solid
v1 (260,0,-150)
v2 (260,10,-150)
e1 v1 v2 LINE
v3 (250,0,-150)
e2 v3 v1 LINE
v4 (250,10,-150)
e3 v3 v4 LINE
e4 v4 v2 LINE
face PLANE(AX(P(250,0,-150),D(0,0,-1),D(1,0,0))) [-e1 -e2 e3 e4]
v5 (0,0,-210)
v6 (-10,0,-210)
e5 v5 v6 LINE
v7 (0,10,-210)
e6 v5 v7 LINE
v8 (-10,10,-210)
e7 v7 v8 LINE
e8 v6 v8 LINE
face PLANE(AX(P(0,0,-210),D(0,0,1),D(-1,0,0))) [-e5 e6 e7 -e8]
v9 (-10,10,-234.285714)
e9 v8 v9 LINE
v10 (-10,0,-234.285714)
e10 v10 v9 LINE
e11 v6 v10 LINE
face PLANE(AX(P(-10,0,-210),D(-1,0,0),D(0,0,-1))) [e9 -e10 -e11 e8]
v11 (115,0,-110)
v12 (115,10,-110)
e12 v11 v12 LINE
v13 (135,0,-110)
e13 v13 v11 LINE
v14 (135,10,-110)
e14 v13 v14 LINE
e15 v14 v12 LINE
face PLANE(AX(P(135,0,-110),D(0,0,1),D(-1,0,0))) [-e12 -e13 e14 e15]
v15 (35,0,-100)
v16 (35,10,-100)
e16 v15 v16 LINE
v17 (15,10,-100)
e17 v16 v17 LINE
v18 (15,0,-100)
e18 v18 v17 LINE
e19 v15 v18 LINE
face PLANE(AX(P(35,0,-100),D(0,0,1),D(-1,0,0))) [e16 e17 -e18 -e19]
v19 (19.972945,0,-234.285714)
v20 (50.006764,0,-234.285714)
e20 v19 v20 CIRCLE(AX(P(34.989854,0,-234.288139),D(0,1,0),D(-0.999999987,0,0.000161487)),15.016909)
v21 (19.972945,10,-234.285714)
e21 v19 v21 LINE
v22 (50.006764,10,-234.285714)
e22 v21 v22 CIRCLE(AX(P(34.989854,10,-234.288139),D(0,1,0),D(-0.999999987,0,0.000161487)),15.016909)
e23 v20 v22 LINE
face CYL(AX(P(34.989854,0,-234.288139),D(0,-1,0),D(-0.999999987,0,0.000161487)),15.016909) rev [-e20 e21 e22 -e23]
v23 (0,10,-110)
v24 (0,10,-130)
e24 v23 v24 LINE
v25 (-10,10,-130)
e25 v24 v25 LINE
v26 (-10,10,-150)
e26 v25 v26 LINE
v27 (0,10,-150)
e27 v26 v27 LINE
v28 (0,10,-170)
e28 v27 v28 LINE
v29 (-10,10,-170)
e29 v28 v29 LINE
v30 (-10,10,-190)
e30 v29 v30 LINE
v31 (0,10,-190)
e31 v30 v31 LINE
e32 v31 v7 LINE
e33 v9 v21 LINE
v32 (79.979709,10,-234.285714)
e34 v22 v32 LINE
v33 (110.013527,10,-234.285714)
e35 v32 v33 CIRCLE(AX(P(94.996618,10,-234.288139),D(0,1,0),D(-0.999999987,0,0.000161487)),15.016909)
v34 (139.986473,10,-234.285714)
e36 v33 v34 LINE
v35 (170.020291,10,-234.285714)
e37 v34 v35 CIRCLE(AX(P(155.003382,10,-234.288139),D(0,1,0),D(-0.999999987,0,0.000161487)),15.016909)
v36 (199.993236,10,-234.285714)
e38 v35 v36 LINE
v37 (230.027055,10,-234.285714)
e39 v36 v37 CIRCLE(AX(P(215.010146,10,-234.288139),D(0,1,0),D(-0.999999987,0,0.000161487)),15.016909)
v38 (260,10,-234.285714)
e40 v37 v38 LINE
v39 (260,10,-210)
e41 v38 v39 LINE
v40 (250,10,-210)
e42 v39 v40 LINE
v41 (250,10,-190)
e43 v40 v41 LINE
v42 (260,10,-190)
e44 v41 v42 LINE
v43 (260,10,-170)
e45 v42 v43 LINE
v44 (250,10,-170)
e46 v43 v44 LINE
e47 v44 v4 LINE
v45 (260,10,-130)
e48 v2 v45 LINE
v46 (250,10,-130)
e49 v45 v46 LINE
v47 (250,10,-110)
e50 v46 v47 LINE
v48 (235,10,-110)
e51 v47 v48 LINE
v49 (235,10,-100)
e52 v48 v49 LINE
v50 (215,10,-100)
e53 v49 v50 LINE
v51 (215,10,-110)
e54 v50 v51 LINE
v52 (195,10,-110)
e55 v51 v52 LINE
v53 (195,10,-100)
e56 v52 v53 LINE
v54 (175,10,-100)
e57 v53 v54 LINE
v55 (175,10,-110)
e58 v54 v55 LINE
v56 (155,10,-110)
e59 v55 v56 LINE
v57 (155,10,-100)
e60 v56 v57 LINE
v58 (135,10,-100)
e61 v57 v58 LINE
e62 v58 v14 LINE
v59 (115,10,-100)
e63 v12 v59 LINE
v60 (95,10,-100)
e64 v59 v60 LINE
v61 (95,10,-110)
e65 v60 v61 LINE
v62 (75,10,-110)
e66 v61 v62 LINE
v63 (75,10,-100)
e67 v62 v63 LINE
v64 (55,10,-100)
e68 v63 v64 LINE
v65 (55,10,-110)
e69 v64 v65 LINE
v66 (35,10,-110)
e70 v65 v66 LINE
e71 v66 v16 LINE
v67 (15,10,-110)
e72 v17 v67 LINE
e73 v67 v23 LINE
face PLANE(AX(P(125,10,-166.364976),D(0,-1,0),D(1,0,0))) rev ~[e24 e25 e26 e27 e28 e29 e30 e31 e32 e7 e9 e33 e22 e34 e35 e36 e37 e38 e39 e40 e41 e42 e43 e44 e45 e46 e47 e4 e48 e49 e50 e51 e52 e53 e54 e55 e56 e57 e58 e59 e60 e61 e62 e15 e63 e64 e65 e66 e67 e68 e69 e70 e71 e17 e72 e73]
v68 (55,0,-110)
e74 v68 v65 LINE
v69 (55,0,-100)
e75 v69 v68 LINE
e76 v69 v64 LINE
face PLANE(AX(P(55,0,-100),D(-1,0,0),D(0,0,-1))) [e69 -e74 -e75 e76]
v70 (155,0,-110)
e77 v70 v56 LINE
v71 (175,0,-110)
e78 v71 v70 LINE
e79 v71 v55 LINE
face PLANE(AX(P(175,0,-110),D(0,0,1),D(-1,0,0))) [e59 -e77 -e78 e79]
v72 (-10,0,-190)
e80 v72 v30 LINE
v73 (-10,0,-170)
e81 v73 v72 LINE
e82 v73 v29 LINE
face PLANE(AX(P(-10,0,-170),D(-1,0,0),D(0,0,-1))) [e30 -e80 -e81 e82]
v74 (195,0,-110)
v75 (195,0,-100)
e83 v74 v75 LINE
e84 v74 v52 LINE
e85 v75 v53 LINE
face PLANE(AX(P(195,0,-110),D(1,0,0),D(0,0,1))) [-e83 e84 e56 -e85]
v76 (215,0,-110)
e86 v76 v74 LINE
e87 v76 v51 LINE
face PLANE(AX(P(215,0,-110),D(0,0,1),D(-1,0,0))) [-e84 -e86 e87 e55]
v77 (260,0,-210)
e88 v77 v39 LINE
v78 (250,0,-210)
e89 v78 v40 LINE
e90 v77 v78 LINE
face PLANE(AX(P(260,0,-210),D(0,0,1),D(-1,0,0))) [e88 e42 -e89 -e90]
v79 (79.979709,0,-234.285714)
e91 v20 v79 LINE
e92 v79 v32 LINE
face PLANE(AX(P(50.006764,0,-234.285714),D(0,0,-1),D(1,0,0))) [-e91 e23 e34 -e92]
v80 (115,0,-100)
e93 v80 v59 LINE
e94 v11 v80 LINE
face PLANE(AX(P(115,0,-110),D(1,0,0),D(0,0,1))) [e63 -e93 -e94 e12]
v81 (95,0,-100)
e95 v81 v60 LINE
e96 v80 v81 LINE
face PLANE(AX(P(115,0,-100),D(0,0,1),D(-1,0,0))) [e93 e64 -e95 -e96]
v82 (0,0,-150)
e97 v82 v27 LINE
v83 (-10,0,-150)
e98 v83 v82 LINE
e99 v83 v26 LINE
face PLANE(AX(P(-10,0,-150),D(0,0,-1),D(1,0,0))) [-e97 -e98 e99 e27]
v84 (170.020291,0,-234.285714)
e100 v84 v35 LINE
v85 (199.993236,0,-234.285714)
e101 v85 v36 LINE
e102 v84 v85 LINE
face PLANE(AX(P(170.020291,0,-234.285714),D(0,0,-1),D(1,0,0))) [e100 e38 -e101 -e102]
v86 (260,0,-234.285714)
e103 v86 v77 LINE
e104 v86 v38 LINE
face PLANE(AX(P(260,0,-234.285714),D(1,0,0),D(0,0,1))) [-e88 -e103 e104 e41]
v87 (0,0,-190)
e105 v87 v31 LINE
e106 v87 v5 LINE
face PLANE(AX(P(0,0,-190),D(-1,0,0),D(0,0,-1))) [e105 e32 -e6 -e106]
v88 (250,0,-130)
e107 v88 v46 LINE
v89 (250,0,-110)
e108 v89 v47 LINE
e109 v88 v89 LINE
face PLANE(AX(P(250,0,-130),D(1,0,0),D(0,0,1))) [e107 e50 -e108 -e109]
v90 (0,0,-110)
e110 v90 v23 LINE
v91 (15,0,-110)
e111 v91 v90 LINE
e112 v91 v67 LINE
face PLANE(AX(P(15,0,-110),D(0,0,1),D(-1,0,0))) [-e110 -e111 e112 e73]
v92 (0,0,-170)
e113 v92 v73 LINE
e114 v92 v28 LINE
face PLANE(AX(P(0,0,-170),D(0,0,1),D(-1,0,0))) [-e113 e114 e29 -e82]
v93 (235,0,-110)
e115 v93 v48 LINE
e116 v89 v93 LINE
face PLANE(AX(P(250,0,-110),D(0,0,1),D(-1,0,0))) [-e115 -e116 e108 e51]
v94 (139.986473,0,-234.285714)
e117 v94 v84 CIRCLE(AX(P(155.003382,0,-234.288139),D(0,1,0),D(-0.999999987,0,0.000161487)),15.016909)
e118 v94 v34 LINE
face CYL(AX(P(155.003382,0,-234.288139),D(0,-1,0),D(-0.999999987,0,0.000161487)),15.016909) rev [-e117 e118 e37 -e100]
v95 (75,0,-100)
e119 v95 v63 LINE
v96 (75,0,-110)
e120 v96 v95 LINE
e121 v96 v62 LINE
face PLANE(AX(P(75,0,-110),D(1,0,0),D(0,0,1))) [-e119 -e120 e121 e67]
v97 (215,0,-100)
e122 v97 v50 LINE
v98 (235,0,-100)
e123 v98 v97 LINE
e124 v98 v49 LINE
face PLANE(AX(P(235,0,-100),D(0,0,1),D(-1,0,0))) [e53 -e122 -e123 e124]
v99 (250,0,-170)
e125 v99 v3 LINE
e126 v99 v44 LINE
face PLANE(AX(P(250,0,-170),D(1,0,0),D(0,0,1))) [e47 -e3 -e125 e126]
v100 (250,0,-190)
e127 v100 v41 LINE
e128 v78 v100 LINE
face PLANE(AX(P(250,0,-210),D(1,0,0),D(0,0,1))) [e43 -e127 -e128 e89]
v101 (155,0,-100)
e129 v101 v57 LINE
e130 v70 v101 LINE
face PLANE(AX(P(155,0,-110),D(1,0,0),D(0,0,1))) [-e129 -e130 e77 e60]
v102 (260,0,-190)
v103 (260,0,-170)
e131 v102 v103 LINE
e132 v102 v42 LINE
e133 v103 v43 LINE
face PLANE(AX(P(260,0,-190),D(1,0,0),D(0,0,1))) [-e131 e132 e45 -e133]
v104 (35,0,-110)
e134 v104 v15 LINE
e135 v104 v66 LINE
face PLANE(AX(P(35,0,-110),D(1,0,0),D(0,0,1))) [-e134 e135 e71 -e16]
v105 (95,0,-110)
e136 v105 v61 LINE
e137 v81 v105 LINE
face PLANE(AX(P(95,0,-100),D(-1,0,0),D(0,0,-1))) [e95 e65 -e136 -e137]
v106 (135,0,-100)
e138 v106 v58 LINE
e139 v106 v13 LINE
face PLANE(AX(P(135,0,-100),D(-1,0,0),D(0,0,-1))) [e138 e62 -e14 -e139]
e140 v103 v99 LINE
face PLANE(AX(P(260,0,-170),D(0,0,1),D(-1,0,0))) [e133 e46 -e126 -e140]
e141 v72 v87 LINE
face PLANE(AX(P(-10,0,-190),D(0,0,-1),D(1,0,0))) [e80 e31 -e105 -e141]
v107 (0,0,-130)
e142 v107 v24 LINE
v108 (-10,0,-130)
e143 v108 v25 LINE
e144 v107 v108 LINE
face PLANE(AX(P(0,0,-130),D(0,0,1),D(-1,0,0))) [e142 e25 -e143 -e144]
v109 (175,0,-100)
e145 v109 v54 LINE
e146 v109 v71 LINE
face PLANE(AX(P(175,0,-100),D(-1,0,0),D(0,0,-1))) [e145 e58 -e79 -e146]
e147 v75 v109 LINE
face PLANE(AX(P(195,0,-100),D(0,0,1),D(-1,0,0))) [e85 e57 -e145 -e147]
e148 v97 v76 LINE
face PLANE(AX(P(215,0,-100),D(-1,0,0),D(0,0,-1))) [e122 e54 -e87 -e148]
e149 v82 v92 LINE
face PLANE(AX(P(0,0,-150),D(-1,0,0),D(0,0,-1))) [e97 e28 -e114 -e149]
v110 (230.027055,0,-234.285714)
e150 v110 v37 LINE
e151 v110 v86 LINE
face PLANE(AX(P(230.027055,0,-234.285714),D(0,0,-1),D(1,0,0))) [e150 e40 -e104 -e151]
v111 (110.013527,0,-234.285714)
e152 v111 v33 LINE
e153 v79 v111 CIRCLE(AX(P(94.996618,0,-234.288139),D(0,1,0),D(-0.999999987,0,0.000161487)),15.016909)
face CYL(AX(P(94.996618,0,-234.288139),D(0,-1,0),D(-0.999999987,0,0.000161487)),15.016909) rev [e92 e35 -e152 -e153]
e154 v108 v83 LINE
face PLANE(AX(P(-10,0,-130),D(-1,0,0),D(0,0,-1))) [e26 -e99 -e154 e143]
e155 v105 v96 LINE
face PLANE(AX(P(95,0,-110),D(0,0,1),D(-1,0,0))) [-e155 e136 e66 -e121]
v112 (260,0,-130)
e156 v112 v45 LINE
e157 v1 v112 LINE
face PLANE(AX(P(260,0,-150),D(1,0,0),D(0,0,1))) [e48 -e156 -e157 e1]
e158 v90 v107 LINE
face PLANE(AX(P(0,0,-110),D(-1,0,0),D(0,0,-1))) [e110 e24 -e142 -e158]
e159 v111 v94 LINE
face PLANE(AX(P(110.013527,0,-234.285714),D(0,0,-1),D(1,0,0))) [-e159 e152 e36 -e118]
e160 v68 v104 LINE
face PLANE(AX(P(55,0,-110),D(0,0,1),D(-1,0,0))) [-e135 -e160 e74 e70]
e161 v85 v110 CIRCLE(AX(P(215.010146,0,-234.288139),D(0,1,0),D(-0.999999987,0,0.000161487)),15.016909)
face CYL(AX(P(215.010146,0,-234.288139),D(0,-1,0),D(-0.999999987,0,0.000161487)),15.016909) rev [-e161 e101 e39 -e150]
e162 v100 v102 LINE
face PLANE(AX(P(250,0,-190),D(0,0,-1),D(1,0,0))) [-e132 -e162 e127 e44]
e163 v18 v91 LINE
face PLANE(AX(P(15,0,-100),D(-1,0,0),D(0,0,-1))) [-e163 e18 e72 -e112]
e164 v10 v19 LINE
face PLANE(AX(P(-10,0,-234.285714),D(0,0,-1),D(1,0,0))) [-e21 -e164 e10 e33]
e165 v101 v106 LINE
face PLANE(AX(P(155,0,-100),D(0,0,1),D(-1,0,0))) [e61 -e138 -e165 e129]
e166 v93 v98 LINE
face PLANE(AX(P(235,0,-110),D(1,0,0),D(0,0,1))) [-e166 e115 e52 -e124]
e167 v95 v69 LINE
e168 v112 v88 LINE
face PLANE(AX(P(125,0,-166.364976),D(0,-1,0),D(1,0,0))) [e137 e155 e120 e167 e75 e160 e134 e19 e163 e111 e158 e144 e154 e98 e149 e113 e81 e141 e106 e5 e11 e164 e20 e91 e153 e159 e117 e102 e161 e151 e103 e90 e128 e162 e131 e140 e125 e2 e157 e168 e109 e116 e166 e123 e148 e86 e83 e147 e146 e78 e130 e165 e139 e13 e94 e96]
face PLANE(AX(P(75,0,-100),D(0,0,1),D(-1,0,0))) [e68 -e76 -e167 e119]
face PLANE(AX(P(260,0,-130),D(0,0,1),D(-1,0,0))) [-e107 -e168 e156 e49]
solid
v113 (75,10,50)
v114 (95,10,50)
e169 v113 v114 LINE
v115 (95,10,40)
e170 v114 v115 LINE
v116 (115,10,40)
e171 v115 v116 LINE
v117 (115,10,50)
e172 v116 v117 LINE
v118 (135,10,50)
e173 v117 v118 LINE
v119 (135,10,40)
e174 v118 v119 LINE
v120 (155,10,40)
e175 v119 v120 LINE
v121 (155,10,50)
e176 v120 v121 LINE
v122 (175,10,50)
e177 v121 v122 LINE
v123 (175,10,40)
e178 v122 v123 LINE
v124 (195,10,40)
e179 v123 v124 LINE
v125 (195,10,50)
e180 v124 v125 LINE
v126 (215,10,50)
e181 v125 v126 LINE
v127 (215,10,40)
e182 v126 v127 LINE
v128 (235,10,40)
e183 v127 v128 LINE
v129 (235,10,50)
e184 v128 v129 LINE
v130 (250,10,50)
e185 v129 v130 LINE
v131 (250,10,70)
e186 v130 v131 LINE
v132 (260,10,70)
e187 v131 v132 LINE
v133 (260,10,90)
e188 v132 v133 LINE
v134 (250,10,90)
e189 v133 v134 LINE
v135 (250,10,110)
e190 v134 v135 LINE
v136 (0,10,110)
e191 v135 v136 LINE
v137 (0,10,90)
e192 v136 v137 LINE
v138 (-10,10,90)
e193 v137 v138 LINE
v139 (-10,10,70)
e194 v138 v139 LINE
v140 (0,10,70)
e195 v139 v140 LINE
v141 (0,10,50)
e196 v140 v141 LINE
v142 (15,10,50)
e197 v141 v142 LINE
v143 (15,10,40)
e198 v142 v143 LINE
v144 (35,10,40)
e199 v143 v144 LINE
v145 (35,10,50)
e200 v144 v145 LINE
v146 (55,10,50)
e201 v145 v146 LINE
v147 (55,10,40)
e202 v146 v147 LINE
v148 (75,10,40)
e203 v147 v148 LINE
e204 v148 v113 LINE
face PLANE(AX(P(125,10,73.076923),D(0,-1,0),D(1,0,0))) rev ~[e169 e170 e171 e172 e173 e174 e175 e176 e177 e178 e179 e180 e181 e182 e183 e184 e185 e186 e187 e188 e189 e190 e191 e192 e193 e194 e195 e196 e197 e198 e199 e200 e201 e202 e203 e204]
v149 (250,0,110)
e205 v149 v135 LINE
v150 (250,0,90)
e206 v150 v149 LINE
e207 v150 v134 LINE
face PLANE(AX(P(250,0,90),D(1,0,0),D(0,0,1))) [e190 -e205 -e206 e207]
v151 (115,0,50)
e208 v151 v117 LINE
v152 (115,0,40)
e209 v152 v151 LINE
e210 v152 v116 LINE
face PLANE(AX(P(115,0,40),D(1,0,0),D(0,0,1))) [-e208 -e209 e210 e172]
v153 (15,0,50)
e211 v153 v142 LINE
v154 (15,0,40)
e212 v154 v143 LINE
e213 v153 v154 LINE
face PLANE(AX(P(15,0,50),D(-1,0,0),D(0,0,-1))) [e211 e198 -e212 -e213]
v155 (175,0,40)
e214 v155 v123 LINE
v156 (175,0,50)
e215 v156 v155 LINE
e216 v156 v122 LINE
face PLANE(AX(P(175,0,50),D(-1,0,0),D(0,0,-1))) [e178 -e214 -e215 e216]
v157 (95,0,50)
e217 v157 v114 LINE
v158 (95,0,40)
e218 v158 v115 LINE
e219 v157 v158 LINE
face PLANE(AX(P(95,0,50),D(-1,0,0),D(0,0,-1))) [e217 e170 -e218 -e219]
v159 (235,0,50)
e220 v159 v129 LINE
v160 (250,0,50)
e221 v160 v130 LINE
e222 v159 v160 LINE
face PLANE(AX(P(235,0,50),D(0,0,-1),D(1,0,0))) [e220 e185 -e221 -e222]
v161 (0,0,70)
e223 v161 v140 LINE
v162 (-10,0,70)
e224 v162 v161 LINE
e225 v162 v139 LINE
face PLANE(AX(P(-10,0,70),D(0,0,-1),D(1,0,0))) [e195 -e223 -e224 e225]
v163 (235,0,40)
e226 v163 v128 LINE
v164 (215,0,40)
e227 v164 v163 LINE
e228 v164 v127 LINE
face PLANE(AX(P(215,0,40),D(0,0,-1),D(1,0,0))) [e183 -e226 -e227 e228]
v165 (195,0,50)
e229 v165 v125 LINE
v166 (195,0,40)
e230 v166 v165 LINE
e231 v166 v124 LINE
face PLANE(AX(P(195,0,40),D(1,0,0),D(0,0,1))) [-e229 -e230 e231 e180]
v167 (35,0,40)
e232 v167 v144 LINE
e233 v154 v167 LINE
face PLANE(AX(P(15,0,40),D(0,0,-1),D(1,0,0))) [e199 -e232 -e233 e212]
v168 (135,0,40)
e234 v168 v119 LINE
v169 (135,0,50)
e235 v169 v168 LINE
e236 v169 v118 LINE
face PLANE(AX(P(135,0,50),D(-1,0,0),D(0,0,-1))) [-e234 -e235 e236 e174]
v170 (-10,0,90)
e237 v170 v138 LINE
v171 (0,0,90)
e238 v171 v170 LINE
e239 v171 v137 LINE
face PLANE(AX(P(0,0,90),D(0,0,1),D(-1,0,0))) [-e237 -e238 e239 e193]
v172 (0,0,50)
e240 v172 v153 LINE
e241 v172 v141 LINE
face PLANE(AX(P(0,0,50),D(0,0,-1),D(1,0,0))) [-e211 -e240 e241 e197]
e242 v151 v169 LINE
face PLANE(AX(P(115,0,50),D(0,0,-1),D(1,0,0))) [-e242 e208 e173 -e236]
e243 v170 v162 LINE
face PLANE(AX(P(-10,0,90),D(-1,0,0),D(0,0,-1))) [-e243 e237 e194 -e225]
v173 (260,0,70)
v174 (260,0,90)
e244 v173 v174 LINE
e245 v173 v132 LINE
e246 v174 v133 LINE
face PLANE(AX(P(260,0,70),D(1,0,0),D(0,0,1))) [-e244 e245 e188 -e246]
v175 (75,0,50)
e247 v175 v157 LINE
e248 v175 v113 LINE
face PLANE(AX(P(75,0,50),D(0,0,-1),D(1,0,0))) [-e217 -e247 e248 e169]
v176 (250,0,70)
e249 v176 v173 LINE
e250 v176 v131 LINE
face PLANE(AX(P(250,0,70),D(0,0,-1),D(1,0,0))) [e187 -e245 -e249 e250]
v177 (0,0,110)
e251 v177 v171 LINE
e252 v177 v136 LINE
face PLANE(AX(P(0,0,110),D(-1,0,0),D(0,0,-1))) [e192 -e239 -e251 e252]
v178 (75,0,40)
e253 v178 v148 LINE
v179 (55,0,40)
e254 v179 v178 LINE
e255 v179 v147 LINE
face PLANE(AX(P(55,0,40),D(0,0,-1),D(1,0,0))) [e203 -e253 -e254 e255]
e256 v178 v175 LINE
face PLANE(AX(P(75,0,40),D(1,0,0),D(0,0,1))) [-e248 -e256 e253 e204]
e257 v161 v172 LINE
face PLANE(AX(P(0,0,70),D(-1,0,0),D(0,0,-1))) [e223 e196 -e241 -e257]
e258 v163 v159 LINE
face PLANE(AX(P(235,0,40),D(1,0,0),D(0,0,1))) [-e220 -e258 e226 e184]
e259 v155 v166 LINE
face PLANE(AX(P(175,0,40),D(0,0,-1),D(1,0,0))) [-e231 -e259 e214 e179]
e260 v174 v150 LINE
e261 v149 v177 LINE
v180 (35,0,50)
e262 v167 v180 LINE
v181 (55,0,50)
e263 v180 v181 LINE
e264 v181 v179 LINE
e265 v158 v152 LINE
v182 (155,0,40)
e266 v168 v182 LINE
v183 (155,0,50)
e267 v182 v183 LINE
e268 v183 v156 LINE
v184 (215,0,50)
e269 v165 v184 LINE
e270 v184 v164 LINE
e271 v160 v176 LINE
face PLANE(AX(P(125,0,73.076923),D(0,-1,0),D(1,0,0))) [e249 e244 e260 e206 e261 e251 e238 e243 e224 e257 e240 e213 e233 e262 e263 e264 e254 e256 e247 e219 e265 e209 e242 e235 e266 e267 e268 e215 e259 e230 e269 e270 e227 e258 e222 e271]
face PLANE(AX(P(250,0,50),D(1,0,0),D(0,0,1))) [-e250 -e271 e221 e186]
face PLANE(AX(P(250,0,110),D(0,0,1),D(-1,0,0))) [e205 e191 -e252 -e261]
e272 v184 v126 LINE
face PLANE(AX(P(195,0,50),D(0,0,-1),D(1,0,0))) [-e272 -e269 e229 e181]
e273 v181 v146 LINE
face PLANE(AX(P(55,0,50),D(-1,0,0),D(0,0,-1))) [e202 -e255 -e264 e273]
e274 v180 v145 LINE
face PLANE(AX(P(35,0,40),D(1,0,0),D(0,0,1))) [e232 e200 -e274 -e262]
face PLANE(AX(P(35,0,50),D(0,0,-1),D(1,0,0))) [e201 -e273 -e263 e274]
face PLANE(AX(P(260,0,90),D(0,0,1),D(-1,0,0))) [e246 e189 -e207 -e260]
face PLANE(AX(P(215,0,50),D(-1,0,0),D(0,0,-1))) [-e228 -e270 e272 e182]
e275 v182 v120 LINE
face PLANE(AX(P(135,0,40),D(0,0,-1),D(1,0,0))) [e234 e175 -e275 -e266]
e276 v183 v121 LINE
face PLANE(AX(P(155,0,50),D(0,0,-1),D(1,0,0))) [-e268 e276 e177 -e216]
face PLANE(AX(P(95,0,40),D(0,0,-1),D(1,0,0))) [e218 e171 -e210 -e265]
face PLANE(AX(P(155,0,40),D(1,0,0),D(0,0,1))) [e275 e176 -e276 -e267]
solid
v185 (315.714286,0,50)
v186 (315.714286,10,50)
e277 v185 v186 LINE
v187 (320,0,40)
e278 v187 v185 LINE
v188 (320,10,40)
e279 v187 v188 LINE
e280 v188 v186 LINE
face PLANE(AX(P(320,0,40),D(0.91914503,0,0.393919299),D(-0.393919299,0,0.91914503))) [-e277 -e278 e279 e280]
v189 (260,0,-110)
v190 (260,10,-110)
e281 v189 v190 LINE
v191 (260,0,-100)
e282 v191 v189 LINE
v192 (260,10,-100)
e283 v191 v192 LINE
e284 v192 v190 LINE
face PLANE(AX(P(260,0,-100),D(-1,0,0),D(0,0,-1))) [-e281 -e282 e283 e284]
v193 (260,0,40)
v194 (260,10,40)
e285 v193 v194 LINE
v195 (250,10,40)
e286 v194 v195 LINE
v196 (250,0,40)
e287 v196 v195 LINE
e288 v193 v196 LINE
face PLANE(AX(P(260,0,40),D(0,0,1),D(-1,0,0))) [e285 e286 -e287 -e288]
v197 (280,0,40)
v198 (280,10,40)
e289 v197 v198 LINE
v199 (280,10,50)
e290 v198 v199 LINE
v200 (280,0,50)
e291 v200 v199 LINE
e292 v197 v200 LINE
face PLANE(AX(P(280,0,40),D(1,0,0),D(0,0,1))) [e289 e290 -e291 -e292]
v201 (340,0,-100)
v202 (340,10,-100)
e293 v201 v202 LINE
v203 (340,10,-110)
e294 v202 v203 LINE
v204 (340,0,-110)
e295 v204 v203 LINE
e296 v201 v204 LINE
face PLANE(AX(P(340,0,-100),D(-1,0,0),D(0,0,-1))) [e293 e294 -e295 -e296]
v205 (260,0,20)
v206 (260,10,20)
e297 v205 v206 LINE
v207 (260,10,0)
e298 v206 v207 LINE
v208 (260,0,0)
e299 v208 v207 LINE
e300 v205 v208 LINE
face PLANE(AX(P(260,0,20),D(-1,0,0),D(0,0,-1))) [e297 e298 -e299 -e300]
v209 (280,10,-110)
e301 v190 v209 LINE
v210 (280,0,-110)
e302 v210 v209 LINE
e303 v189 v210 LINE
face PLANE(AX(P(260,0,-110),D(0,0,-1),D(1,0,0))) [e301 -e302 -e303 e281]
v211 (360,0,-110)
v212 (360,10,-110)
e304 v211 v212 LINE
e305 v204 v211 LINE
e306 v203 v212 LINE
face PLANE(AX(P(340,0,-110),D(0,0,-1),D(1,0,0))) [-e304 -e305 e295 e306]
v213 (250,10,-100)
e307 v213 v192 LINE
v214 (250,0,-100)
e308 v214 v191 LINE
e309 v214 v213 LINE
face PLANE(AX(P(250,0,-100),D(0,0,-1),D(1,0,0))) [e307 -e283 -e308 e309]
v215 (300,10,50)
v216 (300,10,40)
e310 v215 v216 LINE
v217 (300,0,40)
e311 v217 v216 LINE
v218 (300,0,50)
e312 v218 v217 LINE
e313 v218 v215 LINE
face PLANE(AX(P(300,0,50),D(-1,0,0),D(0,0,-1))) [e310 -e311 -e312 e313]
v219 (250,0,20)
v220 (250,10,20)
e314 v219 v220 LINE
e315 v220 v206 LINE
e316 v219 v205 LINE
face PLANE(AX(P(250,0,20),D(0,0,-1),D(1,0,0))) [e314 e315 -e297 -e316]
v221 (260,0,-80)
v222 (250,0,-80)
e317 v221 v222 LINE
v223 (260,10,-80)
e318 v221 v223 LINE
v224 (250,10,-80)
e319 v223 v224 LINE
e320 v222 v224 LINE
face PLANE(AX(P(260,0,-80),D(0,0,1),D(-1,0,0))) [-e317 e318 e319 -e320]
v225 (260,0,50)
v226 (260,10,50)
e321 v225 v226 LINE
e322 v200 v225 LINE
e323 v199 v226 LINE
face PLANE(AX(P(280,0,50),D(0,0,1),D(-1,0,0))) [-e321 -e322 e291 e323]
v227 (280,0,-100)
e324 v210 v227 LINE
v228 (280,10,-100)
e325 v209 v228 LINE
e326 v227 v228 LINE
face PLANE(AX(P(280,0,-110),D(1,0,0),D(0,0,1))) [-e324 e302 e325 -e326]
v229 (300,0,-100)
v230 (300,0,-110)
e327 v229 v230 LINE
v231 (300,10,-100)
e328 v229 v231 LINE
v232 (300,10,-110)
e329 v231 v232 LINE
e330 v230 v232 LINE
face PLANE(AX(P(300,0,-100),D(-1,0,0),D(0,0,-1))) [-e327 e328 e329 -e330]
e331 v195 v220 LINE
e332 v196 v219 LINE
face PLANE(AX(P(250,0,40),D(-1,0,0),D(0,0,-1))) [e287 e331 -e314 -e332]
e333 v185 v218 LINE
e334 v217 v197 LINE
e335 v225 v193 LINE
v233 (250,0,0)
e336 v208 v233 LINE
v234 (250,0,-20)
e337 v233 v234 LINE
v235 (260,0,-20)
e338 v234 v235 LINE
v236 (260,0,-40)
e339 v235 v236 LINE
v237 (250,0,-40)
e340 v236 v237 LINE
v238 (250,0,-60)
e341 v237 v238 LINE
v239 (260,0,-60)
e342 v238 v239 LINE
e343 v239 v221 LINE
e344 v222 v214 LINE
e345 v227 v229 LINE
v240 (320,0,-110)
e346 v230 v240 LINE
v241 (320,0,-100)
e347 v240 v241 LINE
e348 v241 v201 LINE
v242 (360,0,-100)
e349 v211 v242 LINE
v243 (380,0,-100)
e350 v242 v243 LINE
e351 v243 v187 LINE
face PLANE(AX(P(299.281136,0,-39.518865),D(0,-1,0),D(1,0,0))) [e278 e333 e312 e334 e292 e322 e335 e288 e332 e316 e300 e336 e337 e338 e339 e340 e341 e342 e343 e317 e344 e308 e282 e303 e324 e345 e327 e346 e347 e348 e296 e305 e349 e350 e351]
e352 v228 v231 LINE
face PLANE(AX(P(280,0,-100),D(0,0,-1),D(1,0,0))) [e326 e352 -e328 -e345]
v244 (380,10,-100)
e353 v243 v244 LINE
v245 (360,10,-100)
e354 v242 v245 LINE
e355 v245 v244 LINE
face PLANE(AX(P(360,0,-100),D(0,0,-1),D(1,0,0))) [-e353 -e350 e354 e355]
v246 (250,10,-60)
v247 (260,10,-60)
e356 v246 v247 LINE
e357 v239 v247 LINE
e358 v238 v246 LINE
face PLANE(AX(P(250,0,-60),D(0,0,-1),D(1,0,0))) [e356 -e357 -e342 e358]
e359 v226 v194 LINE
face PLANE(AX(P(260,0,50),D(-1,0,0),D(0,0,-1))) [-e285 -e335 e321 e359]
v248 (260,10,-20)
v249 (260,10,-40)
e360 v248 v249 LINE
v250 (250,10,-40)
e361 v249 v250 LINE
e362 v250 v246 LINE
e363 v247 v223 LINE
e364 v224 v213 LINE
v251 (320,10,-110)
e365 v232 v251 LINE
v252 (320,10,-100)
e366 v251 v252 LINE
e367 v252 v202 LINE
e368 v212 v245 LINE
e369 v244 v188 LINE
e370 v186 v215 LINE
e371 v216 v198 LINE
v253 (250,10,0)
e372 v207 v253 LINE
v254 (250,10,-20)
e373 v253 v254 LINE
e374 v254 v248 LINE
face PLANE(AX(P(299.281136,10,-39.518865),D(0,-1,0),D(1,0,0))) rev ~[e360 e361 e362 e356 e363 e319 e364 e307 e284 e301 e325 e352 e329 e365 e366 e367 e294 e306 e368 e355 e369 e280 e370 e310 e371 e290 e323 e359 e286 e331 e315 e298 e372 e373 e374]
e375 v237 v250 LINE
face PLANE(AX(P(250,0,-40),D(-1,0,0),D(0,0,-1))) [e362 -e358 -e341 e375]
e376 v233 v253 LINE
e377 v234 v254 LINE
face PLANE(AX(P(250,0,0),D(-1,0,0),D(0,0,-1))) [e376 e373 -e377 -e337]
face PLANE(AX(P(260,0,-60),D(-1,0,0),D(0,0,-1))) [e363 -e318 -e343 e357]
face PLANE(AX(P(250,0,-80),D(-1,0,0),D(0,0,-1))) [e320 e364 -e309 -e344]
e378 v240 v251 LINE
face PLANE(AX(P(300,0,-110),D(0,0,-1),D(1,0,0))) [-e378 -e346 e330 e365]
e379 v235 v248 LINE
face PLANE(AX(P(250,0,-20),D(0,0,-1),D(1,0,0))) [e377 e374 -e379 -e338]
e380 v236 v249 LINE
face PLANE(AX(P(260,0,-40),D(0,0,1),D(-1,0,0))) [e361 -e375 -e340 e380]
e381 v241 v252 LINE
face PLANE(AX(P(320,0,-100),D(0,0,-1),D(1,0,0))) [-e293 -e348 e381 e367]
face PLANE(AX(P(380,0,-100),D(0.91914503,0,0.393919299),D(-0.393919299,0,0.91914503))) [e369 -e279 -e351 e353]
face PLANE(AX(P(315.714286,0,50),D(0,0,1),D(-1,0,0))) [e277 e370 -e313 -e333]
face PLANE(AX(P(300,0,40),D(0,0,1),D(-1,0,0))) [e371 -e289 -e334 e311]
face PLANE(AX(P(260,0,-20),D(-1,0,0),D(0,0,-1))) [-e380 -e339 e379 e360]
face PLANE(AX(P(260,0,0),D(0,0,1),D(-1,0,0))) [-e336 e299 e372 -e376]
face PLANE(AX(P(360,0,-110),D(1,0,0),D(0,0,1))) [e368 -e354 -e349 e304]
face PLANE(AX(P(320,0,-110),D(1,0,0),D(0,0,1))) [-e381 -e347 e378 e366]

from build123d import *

# Parameters (mm, degrees)
F1_DEPTH = 10


# Not quite as in the source:
# - a feature names something its author has since deleted; it is built from what else it names


with BuildPart() as f1:
    # F0 (on Front) → F1 (new body)
    with BuildSketch(Plane.XZ):
        with BuildLine():
            Line((135, -100), (135, -110))
            Line((135, -110), (115, -110))
            Line((115, -110), (115, -100))
            Line((115, -100), (95, -100))
            Line((95, -100), (95, -110))
            Line((95, -110), (75, -110))
            Line((75, -110), (75, -100))
            Line((75, -100), (55, -100))
            Line((55, -100), (55, -110))
            Line((55, -110), (35, -110))
            Line((35, -110), (35, -100))
            Line((35, -100), (15, -100))
            Line((15, -100), (15, -110))
            Line((15, -110), (0, -110))
            Line((0, -110), (0, -130))
            Line((0, -130), (-10, -130))
            Line((-10, -130), (-10, -150))
            Line((-10, -150), (0, -150))
            Line((0, -150), (0, -170))
            Line((0, -170), (-10, -170))
            Line((-10, -170), (-10, -190))
            Line((-10, -190), (0, -190))
            Line((0, -190), (0, -210))
            Line((0, -210), (-10, -210))
            Line((-10, -210), (-10, -234.2857142857))
            Line((-10, -234.2857142857), (19.9729451345, -234.2857142857))
            ThreePointArc((19.9729451345, -234.2857142857), (34.9898544254, -219.2712298368), (50.0067637164, -234.2857142857))
            Line((50.0067637164, -234.2857142857), (79.9797088509, -234.2857142857))
            ThreePointArc((79.9797088509, -234.2857142857), (94.9966181418, -219.2712298368), (110.0135274328, -234.2857142857))
            Line((110.0135274328, -234.2857142857), (139.9864725672, -234.2857142857))
            ThreePointArc((139.9864725672, -234.2857142857), (155.0033818582, -219.2712298368), (170.0202911491, -234.2857142857))
            Line((170.0202911491, -234.2857142857), (199.9932362836, -234.2857142857))
            ThreePointArc((199.9932362836, -234.2857142857), (215.0101455746, -219.2712298368), (230.0270548655, -234.2857142857))
            Line((230.0270548655, -234.2857142857), (260, -234.2857142857))
            Line((260, -234.2857142857), (260, -210))
            Line((260, -210), (250, -210))
            Line((250, -210), (250, -190))
            Line((250, -190), (260, -190))
            Line((260, -190), (260, -170))
            Line((260, -170), (250, -170))
            Line((250, -170), (250, -150))
            Line((250, -150), (260, -150))
            Line((260, -150), (260, -130))
            Line((260, -130), (250, -130))
            Line((250, -130), (250, -110))
            Line((250, -110), (235, -110))
            Line((235, -110), (235, -100))
            Line((235, -100), (215, -100))
            Line((215, -100), (215, -110))
            Line((215, -110), (195, -110))
            Line((195, -110), (195, -100))
            Line((195, -100), (175, -100))
            Line((175, -100), (175, -110))
            Line((175, -110), (155, -110))
            Line((155, -110), (155, -100))
            Line((155, -100), (135, -100))
        make_face()
    extrude(amount=-F1_DEPTH)


with BuildPart() as f1b:
    # F0 (on Front) → F1, piece 2 (new body)
    with BuildSketch(Plane.XZ):
        Polygon((260, -100), (260, -110), (280, -110), (280, -100), (300, -100), (300, -110), (320, -110), (320, -100), (340, -100), (340, -110), (360, -110), (360, -100), (380, -100), (320, 40), (315.7142857143, 50), (300, 50), (300, 40), (280, 40), (280, 50), (260, 50), (260, 40), (250, 40), (250, 20), (260, 20), (260, 0), (250, 0), (250, -20), (260, -20), (260, -40), (250, -40), (250, -60), (260, -60), (260, -80), (250, -80), (250, -100), align=None)
    extrude(amount=-F1_DEPTH)


with BuildPart() as f1c:
    # F0 (on Front) → F1, piece 3 (new body)
    with BuildSketch(Plane.XZ):
        Polygon((235, 50), (250, 50), (250, 70), (260, 70), (260, 90), (250, 90), (250, 110), (0, 110), (0, 90), (-10, 90), (-10, 70), (0, 70), (0, 50), (15, 50), (15, 40), (35, 40), (35, 50), (55, 50), (55, 40), (75, 40), (75, 50), (95, 50), (95, 40), (115, 40), (115, 50), (135, 50), (135, 40), (155, 40), (155, 50), (175, 50), (175, 40), (195, 40), (195, 50), (215, 50), (215, 40), (235, 40), align=None)
    extrude(amount=-F1_DEPTH)


solid = Compound([f1.part, f1b.part, f1c.part])
